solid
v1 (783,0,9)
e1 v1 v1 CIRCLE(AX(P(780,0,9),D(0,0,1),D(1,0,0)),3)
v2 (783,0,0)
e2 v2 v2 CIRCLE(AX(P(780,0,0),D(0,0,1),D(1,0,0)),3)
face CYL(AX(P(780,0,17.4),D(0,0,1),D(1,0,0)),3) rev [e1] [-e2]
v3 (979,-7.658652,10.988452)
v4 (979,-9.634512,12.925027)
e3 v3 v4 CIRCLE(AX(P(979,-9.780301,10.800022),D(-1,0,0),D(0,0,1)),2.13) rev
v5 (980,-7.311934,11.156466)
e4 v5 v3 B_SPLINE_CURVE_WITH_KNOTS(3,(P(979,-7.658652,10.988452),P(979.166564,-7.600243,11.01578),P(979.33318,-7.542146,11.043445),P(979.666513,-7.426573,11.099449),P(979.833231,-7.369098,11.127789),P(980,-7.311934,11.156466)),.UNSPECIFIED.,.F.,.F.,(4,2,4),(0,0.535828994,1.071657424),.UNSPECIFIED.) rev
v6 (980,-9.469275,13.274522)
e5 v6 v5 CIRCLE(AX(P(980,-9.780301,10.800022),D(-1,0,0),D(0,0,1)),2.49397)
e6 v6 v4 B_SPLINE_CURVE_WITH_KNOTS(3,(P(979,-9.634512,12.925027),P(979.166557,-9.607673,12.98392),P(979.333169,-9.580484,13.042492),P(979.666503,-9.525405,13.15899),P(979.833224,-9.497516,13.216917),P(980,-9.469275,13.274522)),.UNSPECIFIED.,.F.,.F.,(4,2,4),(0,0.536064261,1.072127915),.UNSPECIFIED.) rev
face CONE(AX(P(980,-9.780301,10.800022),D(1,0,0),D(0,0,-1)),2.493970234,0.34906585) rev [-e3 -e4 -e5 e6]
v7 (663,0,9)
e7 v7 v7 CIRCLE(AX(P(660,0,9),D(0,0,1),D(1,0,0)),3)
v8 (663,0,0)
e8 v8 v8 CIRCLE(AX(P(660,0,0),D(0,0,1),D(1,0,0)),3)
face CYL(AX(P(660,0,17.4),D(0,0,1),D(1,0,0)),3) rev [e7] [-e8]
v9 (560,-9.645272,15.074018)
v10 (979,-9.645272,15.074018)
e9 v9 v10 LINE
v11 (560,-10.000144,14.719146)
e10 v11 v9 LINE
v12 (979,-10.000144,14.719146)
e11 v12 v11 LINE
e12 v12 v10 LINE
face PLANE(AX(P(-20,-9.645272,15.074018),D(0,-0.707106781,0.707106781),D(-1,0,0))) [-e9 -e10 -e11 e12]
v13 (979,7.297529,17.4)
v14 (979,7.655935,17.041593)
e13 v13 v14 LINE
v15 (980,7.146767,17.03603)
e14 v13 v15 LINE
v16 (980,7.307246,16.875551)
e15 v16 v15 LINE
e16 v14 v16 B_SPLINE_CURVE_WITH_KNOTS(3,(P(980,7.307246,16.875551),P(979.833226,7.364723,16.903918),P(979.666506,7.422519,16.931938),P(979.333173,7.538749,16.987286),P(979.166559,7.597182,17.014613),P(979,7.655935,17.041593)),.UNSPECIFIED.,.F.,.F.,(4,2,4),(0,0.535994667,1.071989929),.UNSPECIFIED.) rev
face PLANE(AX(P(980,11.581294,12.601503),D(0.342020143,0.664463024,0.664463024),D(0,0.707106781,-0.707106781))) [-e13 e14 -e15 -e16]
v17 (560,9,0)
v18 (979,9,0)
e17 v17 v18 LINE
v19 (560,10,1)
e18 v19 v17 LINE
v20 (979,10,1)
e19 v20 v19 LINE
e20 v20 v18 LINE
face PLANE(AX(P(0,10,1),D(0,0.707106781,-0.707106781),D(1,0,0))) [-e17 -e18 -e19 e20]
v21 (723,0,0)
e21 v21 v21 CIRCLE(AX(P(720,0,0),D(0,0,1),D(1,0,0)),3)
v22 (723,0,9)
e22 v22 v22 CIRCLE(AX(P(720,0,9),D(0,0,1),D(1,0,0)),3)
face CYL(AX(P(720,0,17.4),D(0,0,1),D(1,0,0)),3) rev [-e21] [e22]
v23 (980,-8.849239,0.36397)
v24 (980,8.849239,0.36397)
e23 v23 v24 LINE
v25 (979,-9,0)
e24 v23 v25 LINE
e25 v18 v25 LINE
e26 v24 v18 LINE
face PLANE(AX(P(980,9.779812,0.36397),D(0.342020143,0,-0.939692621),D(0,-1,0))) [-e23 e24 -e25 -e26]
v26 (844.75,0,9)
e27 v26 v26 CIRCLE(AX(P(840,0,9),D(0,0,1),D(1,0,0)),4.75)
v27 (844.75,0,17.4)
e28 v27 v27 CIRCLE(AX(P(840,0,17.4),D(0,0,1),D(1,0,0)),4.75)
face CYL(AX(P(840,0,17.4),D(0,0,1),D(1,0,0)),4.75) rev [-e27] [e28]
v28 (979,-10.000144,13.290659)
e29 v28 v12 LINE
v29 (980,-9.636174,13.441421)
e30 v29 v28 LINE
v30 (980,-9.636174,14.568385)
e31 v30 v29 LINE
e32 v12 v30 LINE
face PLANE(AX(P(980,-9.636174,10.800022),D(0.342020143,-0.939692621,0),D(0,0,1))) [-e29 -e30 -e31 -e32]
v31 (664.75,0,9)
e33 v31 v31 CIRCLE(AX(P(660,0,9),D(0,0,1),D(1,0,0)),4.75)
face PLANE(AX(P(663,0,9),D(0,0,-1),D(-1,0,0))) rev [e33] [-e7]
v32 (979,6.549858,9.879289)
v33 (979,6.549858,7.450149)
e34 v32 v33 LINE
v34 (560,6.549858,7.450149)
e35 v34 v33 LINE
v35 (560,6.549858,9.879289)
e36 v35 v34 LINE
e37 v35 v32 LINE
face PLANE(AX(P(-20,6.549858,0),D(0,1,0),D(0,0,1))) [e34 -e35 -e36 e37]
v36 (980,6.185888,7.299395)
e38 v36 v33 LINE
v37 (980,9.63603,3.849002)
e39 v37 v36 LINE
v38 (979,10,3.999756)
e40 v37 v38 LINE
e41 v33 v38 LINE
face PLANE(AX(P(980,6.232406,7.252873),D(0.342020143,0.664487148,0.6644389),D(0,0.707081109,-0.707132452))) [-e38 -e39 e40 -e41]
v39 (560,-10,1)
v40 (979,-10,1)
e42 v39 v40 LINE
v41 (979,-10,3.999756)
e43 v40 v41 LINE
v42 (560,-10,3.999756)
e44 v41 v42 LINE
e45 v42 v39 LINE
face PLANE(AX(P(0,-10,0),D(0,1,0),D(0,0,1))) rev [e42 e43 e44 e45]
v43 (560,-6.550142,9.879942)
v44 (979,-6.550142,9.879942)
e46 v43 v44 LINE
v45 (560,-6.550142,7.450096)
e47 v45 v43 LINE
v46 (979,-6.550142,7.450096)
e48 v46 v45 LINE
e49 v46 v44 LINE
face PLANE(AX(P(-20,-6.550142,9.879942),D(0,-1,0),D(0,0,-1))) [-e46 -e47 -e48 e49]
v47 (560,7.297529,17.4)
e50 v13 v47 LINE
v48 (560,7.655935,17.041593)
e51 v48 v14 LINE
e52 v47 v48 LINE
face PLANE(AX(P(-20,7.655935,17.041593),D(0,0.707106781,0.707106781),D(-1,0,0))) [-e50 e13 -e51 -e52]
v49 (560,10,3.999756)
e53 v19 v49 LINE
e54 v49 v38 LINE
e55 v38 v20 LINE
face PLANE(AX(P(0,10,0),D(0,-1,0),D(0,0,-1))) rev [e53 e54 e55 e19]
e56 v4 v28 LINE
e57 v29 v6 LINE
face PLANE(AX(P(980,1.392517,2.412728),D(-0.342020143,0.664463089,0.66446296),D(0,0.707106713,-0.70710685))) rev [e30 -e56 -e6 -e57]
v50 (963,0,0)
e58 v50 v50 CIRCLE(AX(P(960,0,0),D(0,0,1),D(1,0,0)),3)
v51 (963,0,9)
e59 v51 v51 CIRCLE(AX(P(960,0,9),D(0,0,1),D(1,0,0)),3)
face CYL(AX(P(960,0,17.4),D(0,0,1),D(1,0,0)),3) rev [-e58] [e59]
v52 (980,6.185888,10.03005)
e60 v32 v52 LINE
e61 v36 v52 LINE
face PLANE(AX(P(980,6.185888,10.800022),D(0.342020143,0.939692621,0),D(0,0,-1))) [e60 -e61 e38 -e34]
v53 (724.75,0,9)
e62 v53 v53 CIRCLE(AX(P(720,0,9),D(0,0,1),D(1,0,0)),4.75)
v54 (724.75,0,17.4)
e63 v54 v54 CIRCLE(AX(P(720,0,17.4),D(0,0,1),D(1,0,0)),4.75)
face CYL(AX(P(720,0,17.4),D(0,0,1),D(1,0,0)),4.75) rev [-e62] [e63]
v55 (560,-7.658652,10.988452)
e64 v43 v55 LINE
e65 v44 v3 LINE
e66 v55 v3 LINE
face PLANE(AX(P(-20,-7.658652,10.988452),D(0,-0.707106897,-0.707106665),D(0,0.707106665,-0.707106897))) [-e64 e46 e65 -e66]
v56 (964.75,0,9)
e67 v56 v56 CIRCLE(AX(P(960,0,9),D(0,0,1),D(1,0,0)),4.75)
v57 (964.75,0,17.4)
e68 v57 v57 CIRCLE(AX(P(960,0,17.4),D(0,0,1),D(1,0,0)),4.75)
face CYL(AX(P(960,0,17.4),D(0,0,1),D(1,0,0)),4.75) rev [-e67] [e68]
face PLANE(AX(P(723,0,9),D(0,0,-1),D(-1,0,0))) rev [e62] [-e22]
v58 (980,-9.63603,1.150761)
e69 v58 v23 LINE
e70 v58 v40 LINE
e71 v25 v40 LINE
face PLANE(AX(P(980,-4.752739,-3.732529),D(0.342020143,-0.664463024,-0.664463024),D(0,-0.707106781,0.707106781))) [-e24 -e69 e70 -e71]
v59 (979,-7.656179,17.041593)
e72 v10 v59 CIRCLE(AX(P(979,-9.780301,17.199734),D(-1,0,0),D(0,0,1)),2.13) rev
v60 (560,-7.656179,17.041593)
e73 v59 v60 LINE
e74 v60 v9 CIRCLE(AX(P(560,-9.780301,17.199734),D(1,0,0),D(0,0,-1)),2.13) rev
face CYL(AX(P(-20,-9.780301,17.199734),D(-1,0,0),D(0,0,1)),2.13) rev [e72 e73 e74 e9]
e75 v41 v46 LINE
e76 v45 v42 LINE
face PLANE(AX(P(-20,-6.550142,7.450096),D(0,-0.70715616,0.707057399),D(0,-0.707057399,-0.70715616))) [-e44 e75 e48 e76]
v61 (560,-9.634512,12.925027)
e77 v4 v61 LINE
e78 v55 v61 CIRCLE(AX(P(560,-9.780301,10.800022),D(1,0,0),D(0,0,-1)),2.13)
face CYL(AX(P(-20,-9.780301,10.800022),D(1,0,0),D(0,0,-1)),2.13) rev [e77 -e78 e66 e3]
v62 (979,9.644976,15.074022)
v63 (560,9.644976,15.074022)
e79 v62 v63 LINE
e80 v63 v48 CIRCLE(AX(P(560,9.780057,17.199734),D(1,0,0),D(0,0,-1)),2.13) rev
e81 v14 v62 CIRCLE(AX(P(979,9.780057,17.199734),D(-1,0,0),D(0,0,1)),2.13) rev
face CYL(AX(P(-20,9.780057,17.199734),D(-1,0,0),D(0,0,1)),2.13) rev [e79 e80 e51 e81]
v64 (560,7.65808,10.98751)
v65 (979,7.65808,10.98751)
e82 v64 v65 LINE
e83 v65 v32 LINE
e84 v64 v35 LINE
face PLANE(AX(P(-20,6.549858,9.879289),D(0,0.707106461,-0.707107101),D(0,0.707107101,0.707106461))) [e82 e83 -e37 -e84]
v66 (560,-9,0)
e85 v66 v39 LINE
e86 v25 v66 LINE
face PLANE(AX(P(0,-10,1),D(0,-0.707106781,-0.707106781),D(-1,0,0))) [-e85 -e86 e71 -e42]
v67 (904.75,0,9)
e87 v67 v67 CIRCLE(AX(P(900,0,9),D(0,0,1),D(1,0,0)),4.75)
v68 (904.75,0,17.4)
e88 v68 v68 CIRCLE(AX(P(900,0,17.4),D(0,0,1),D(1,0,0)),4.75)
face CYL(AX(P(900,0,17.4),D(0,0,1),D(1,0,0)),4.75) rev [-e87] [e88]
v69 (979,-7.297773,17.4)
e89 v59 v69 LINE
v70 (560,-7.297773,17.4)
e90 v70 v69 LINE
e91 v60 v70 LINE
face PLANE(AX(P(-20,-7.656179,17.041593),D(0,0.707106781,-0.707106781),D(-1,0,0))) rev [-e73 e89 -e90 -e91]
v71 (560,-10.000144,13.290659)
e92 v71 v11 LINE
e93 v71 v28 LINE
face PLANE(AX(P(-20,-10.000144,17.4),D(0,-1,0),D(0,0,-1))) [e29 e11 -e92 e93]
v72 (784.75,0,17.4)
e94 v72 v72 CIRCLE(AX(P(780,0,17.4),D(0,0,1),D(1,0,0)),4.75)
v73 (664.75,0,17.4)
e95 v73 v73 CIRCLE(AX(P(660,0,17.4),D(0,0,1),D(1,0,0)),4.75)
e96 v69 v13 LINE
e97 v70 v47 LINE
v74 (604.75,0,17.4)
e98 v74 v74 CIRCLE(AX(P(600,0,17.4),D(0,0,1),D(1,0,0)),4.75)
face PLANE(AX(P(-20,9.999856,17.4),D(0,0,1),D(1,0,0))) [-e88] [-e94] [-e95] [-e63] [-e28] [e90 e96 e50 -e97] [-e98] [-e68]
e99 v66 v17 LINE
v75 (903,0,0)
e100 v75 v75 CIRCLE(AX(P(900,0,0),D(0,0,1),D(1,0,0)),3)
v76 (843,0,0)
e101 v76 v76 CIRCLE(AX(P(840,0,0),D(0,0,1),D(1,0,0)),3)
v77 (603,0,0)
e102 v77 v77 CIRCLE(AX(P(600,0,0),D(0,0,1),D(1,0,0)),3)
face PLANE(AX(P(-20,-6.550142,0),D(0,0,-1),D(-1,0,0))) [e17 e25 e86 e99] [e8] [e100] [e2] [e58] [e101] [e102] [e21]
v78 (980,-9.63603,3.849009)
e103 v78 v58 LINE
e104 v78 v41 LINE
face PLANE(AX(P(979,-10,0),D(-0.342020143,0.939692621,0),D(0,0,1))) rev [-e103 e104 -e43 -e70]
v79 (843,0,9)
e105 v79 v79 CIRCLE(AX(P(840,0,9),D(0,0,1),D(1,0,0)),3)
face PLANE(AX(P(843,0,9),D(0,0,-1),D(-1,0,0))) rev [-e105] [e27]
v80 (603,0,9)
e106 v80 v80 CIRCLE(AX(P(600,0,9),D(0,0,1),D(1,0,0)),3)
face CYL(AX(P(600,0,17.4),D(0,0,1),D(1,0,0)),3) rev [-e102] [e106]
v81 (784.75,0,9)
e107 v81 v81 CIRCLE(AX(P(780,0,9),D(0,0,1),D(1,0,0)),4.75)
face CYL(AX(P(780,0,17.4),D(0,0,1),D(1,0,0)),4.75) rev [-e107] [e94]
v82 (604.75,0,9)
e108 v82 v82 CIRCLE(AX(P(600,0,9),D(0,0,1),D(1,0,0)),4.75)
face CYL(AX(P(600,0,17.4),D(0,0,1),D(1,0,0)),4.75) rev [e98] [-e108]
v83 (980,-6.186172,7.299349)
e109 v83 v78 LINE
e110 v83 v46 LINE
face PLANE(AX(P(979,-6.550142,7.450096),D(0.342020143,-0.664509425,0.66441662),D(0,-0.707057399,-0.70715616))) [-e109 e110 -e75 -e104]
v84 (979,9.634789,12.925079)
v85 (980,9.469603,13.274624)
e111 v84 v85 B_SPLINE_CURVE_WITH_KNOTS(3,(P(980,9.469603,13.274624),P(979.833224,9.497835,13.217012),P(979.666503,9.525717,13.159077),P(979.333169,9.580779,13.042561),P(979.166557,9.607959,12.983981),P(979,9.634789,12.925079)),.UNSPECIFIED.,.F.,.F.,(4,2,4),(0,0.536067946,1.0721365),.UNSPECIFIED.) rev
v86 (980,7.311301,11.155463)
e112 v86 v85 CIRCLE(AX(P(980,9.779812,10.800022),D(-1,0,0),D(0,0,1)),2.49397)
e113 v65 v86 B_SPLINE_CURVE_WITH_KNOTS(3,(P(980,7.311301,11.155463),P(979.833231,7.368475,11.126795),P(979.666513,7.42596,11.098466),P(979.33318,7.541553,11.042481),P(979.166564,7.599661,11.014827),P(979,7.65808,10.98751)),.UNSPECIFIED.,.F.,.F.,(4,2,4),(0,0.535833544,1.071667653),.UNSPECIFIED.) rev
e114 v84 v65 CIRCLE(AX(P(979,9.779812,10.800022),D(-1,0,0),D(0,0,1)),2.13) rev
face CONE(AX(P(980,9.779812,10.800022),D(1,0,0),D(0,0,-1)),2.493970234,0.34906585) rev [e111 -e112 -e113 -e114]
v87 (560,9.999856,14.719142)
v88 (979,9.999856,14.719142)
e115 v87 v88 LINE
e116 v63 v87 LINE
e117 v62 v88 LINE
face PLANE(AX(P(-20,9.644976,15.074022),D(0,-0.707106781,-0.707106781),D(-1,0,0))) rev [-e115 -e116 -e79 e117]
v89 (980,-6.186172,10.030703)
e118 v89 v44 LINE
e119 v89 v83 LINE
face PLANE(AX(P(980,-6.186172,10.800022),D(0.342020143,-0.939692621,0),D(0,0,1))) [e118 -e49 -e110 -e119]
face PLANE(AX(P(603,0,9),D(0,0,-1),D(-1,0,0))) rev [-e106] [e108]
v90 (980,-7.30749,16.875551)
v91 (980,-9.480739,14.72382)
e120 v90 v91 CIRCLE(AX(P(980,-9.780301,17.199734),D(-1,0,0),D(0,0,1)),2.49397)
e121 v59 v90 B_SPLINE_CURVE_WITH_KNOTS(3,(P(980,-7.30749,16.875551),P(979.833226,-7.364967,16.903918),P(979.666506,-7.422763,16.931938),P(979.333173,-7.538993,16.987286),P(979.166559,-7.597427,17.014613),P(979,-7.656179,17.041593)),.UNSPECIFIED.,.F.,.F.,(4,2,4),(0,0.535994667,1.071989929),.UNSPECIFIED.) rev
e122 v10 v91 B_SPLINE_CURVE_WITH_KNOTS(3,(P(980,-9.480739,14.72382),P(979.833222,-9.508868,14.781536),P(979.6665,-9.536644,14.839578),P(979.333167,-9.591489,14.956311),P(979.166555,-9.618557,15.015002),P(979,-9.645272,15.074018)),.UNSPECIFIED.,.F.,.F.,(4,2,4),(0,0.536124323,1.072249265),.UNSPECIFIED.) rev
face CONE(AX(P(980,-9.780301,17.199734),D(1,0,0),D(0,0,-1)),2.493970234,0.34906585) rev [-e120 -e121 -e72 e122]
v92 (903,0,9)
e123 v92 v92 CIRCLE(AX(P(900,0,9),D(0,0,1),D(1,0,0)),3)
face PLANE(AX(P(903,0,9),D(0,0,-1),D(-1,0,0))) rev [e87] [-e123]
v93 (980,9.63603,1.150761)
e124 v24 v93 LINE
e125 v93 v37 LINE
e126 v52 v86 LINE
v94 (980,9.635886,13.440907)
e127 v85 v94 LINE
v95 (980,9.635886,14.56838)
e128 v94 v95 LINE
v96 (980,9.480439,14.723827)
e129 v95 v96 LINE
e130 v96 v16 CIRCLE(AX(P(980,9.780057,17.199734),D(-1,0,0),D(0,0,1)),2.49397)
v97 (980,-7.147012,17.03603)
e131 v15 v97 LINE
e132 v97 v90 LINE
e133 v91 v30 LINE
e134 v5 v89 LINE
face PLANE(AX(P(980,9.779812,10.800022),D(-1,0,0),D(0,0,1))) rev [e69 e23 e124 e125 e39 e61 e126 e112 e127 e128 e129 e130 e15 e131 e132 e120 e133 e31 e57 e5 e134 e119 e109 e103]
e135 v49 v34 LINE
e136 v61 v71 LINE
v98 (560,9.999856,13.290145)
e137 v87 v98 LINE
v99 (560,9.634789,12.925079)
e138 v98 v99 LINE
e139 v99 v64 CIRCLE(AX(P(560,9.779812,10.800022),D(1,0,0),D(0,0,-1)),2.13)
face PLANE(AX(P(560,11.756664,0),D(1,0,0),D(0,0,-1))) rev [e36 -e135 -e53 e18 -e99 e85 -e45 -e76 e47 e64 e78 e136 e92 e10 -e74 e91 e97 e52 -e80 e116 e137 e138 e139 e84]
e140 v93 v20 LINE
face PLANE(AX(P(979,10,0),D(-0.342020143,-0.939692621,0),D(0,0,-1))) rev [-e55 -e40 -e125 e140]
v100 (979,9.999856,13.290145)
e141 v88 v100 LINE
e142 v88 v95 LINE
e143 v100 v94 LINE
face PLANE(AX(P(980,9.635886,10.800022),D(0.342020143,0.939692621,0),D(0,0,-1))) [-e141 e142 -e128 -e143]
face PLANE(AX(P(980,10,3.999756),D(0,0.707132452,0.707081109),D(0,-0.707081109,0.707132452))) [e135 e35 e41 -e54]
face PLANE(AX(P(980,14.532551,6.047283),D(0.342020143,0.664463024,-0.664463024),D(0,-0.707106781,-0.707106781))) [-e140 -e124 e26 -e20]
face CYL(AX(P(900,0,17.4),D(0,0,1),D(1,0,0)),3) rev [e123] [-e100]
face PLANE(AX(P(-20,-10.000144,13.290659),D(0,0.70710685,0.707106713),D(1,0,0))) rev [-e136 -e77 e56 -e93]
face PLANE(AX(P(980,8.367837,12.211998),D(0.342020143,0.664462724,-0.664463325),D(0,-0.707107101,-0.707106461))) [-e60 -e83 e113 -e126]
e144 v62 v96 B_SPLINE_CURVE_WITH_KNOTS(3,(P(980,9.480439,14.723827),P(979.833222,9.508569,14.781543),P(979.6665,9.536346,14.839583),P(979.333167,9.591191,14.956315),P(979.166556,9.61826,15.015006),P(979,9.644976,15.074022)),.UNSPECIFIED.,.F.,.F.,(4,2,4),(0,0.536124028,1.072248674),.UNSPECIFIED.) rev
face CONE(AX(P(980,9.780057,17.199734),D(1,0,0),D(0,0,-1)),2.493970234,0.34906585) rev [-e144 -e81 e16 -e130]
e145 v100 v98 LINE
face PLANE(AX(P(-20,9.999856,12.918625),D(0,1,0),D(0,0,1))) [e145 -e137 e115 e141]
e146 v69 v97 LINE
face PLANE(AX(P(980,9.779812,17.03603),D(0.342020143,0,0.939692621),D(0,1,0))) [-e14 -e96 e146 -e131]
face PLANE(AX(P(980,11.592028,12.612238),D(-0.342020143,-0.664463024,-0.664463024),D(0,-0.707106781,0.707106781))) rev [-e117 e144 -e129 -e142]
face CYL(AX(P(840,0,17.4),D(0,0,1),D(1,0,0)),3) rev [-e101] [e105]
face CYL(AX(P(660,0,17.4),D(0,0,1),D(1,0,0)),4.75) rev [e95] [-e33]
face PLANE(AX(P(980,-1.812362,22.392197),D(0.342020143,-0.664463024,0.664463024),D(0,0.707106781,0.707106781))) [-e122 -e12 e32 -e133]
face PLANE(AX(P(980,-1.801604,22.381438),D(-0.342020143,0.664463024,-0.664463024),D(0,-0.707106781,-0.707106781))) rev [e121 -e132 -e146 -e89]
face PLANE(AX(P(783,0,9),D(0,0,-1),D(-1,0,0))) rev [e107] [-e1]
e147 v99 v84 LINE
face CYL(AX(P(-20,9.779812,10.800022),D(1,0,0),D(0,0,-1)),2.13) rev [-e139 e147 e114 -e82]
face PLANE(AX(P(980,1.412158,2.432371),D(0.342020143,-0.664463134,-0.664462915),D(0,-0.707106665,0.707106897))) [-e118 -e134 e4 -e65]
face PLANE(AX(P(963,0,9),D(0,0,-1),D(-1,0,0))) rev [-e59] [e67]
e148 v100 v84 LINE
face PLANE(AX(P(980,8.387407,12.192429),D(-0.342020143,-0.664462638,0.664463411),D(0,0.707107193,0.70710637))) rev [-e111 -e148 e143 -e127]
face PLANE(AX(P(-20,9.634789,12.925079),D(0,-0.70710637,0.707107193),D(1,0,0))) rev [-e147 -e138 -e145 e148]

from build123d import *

# Parameters (mm, degrees)
BOSS_EXTRUDE1_DEPTH = 1000
SKETCH2_W           = 1000
SKETCH2_H           = 7.450095573
BOSS_EXTRUDE2_DEPTH = 3.4498578
SKETCH3_W           = 1000
SKETCH3_H           = 3.9997559
BOSS_EXTRUDE3_DEPTH = 3.4501422
DRAFT1_ANGLE        = 45.002080143
DRAFT2_ANGLE        = 45.004001238
HOLE1_D             = 4.26
HOLE2_D             = 6
HOLE2_CBORE_D       = 9.5
HOLE2_CBORE_DEPTH   = 8.4
CHAMFER1_SIZE       = 0.372012979
CHAMFER2_SIZE       = 0.361963418
CHAMFER3_SIZE       = 1
CHAMFER4_SIZE       = 0.371519866
CHAMFER5_SIZE       = 0.363970234
CHAMFER5_SIZE_2     = 1
SKETCH8_W           = 580
SKETCH8_H           = 21.756808221
CUT_EXTRUDE1_DEPTH  = 981.205469728


with BuildPart() as part:
    # Sketch1 → Boss-Extrude1 (new body)
    with BuildSketch(Plane(origin=(980, 0, 0), x_dir=(0, 0, -1), z_dir=(1, 0, 0))):
        with BuildLine():
            Line((-9.879942, -6.5501422), (0, -6.5501422))
            Line((0, -6.5501422), (0, 6.5498578))
            Line((0, 6.5498578), (-9.8792889, 6.5498578))
            Line((-9.8792889, 6.5498578), (-10.98751021, 7.658080112))
            ThreePointArc((-10.98751021, 7.658080112), (-12.443339621, 8.424671607), (-12.918625382, 9.9998558))
            Line((-12.918625382, 9.9998558), (-17.4, 9.9998558))
            Line((-17.4, 9.9998558), (-17.4, -10.0001442))
            Line((-17.4, -10.0001442), (-12.918646144, -10.0001442))
            ThreePointArc((-12.918646144, -10.0001442), (-12.443576435, -8.425447232), (-10.98845212, -7.658651955))
            Line((-10.98845212, -7.658651955), (-9.879942, -6.5501422))
        make_face()
    extrude(amount=-BOSS_EXTRUDE1_DEPTH)

    # Sketch2 → Boss-Extrude2 (add)
    with BuildSketch(Plane.XZ.offset(6.5501422)):
        with Locations((480, 3.725047787)):
            Rectangle(SKETCH2_W, SKETCH2_H)
    extrude(amount=BOSS_EXTRUDE2_DEPTH)

    # Sketch3 → Boss-Extrude3 (add)
    with BuildSketch(Plane(origin=(0, 6.5498578, 0), x_dir=(-1, 0, 0), z_dir=(0, 1, 0))):
        with Locations((-480, 1.99987795)):
            Rectangle(SKETCH3_W, SKETCH3_H)
    extrude(amount=BOSS_EXTRUDE3_DEPTH)

    # Draft1
    draft1_faces = [part.faces().sort_by_distance(p)[0] for p in [
        (480, 8.2749289, 3.9997559),
    ]]
    draft(draft1_faces, Plane.ZX.offset(10), DRAFT1_ANGLE)

    # Draft2
    draft2_faces = [part.faces().sort_by_distance(p)[0] for p in [
        (480, -8.2750711, 7.450095573),
    ]]
    draft(draft2_faces, Plane(origin=(-20, -6.5501422, 9.879942), x_dir=(0, 0, -1), z_dir=(0, -1, 0)), DRAFT2_ANGLE)

    # Hole1 (through all)
    with Locations(Plane.ZY.offset(20)):
        with Locations((17.19973415, 9.78005665), (17.19973415, -9.78030085)):
            Hole(HOLE1_D / 2)

    # Hole2 (through all)
    with Locations(Plane.XY.offset(17.4)):
        with Locations((960, 0), (900, 0), (840, 0), (780, 0), (720, 0), (660, 0), (600, 0), (540, 0), (480, 0), (420, 0), (360, 0), (300, 0), (240, 0), (180, 0), (120, 0), (60, 0), (0, 0)):
            CounterBoreHole(HOLE2_D / 2, HOLE2_CBORE_D / 2, HOLE2_CBORE_DEPTH)

    # Chamfer1
    # the kernel refuses this chamfer: 0.372012979, 0.338849035 mm, written as the material it takes off along each edge
    with BuildSketch(Plane(origin=(980.956699451, -10.0001442, 12.918646144), x_dir=(0, 0, 1), z_dir=(-1, 0, 0))) as chamfer1_piece_1:
        with BuildLine():
            Line((CHAMFER1_SIZE * 0.999999998756, 0), (0.006380544, 0.365632364))
            ThreePointArc((0.006380544, 0.365632364), (0.011135852, 0.187879029), (0, 0))
            Line((0, 0), (CHAMFER1_SIZE * 0.999999998756, 0))
        make_face()
    extrude(amount=1001.913398901, mode=Mode.SUBTRACT)

    # Chamfer2
    # the kernel refuses this chamfer: 0.361963418, 0.332200971, 0.329701008, 0.329695423 mm, written as the material it takes off along each edge
    with BuildSketch(Plane(origin=(-20.930855163, -10.0001442, 15.081109855), x_dir=(0, 0, -1), z_dir=(1, 0, 0))) as chamfer2_piece_1:
        with BuildLine():
            Line((CHAMFER2_SIZE * 0.999999998629, 0), (0.007091411, 0.354872006))
            ThreePointArc((0.007091411, 0.354872006), (0.011045386, 0.182332682), (0, 0))
            Line((0, 0), (CHAMFER2_SIZE * 0.999999998629, 0))
        make_face()
    extrude(amount=1001.861710326, mode=Mode.SUBTRACT)
    with BuildSketch(Plane(origin=(-20.930855163, -7.659736399, 17.4), x_dir=(0, 0.00992372921433692, -0.9999507585868819), z_dir=(1, 0, 0))) as chamfer2_piece_2:
        with BuildLine():
            Line((0.358424162, 0), (CHAMFER2_SIZE * 0.00992372920073, CHAMFER2_SIZE * 0.999950757216))
            Line((CHAMFER2_SIZE * 0.00992372920073, CHAMFER2_SIZE * 0.999950757216), (0, 0))
            ThreePointArc((0, 0), (0.184310403, 0.007546483), (0.358424162, 0))
        make_face()
    extrude(amount=1001.861710326, mode=Mode.SUBTRACT)
    with BuildSketch(Plane(origin=(-20.930855163, 7.659492199, 17.4), x_dir=(0, -1, 0), z_dir=(1, 0, 0))) as chamfer2_piece_3:
        with BuildLine():
            Line((CHAMFER2_SIZE * 0.999999998629, 0), (0.003556904, 0.358406513))
            ThreePointArc((0.003556904, 0.358406513), (0.009375158, 0.184226438), (0, 0))
            Line((0, 0), (CHAMFER2_SIZE * 0.999999998629, 0))
        make_face()
    extrude(amount=1001.861710326, mode=Mode.SUBTRACT)
    with BuildSketch(Plane(origin=(-20.930855163, 9.9998558, 15.081105269), x_dir=(0, -0.9998008523761441, -0.019956342047966567), z_dir=(1, 0, 0))) as chamfer2_piece_4:
        with BuildLine():
            Line((0.35495059, 0), (CHAMFER2_SIZE * 0.0199563420206, CHAMFER2_SIZE * 0.999800851005))
            Line((CHAMFER2_SIZE * 0.0199563420206, CHAMFER2_SIZE * 0.999800851005), (0, 0))
            ThreePointArc((0, 0), (0.182520953, 0.007400676), (0.35495059, 0))
        make_face()
    extrude(amount=1001.861710326, mode=Mode.SUBTRACT)

    # Chamfer3
    chamfer3_edges = [part.edges().sort_by_distance(p)[0] for p in [
        (480, -10, 0),
        (480, 10, 0),
    ]]
    chamfer(chamfer3_edges, length=CHAMFER3_SIZE)

    # Chamfer4
    # the kernel refuses this chamfer: 0.371519866, 0.338374363 mm, written as the material it takes off along each edge
    with BuildSketch(Plane(origin=(980.955431303, 9.9998558, 12.918625382), x_dir=(0, -0.9998437779419388, 0.017675398462010005), z_dir=(-1, 0, 0))) as chamfer4_piece_1:
        with BuildLine():
            Line((0.365123625, 0), (CHAMFER4_SIZE * 0.0176753984456, CHAMFER4_SIZE * 0.999843777013))
            Line((CHAMFER4_SIZE * 0.0176753984456, CHAMFER4_SIZE * 0.999843777013), (0, 0))
            ThreePointArc((0, 0), (0.187754336, 0.007831758), (0.365123625, 0))
        make_face()
    extrude(amount=1001.910862607, mode=Mode.SUBTRACT)

    # Chamfer5
    # the kernel refuses this chamfer: 1, 0.363970234 mm, written as the material it takes off along each edge
    with BuildSketch(Plane(origin=(980, 9.77981245, 10.80002185), x_dir=(0, -0.42648637425097896, -0.9044939870326689), z_dir=(0, 0.9044939870326689, -0.42648637425097896))) as chamfer5_piece_1:
        Polygon((2.13 + CHAMFER5_SIZE, 0), (2.13, CHAMFER5_SIZE_2), (2.13, 0), align=None)
    revolve(axis=Axis((980, 9.77981245, 10.80002185), (-1, 0, 0)), revolution_arc=220.656237873, mode=Mode.SUBTRACT)
    with BuildSketch(Plane(origin=(980, 4.715484283, 8.044917043), x_dir=(0, -0.7071064613613919, 0.7071071010115584), z_dir=(0, 0.7071071010115584, 0.7071064613613921))) as chamfer5_piece_2_section:
        Polygon((CHAMFER5_SIZE, 0), (0, -CHAMFER5_SIZE_2), (0, 0), align=None)
    chamfer5_piece_2 = extrude(amount=6.75565178, mode=Mode.PRIVATE)
    chamfer5_piece_2 = split(chamfer5_piece_2, bisect_by=Plane(origin=(980, 6.5498578, 8.044917043), z_dir=(0, 1, 0)), keep=Keep.TOP, mode=Mode.PRIVATE)
    add(chamfer5_piece_2, mode=Mode.SUBTRACT)
    with BuildSketch(Plane(origin=(980, -6.5501422, 12.474136733), x_dir=(0, 1, 0), z_dir=(0, 0, -1))) as chamfer5_piece_3_section:
        Polygon((CHAMFER5_SIZE, 0), (0, -CHAMFER5_SIZE_2), (0, 0), align=None)
    chamfer5_piece_3 = extrude(amount=7.618235892, mode=Mode.PRIVATE)
    chamfer5_piece_3 = split(chamfer5_piece_3, bisect_by=Plane(origin=(980, -4.038121645, 9.962467006), z_dir=(0, -0.7071561601012581, 0.7070573988233514)), keep=Keep.TOP, mode=Mode.PRIVATE)
    chamfer5_piece_3 = split(chamfer5_piece_3, bisect_by=Plane(origin=(980, -7.847239567, 11.177039793), z_dir=(0, -0.7071068974739103, -0.7071066648991656)), keep=Keep.TOP, mode=Mode.PRIVATE)
    add(chamfer5_piece_3, mode=Mode.SUBTRACT)
    with BuildSketch(Plane(origin=(980, -9.493024341, 12.822825109), x_dir=(0, 0.7071068974739103, 0.7071066648991655), z_dir=(0, 0.7071066648991656, -0.7071068974739103))) as chamfer5_piece_4_section:
        Polygon((CHAMFER5_SIZE, 0), (0, -CHAMFER5_SIZE_2), (0, 0), align=None)
    chamfer5_piece_4 = extrude(amount=6.756059252, mode=Mode.PRIVATE)
    chamfer5_piece_4 = split(chamfer5_piece_4, bisect_by=Plane(origin=(980, -6.5501422, 12.822825109), z_dir=(0, -1, 0)), keep=Keep.TOP, mode=Mode.PRIVATE)
    add(chamfer5_piece_4, mode=Mode.SUBTRACT)
    with BuildSketch(Plane(origin=(980, -9.78030085, 10.80002185), x_dir=(0, -0.9126940639173625, 0.4086435435560058), z_dir=(0, -0.4086435435560058, -0.9126940639173625))) as chamfer5_piece_5:
        Polygon((2.13 + CHAMFER5_SIZE, 0), (2.13, CHAMFER5_SIZE_2), (2.13, 0), align=None)
    revolve(axis=Axis((980, -9.78030085, 10.80002185), (-1, 0, 0)), revolution_arc=220.610102929, mode=Mode.SUBTRACT)
    with BuildSketch(Plane(origin=(980, -11.834516709, 15.125031988), x_dir=(0, 0.7071068497715801, 0.7071067126015084), z_dir=(0, 0.7071067126015084, -0.70710684977158))) as chamfer5_piece_6:
        Polygon((CHAMFER5_SIZE, 0), (0, -CHAMFER5_SIZE_2), (0, 0), align=None)
    extrude(amount=5.705471763, mode=Mode.SUBTRACT)
    with BuildSketch(Plane(origin=(980, 9.78005665, 17.19973415), x_dir=(4.803669199504906e-13, 0.9147457522504255, -0.40402996020072945), z_dir=(2.0897664314390657e-13, 0.40402996020072945, 0.9147457522504255))) as chamfer5_piece_7:
        Polygon((2.13 + CHAMFER5_SIZE, 0), (2.13, CHAMFER5_SIZE_2), (2.13, 0), align=None)
    revolve(axis=Axis((980, 9.78005665, 17.19973415), (-1, 0, 0)), revolution_arc=221.717516402, mode=Mode.SUBTRACT)
    with BuildSketch(Plane(origin=(980, -10.0001442, 17.313341171), x_dir=(0, 1, 0), z_dir=(0, 0, -1)), Plane(origin=(-20, -10.0001442, 17.313341171), x_dir=(1, 0, 0), z_dir=(0, 0, -1))) as chamfer5_piece_8:
        Polygon((CHAMFER5_SIZE, 0), (0, -CHAMFER5_SIZE_2), (0, 0), align=None)
    extrude(amount=6.61687678, mode=Mode.SUBTRACT)
    with BuildSketch(Plane(origin=(980, 9.891723514, 17.4), x_dir=(0, 0, -1), z_dir=(0, -1, 0)), Plane(origin=(-20, 9.891723514, 17.4), x_dir=(1, 0, 0), z_dir=(0, -1, 0))) as chamfer5_piece_9:
        Polygon((CHAMFER5_SIZE, 0), (0, -CHAMFER5_SIZE_2), (0, 0), align=None)
    extrude(amount=19.783691229, mode=Mode.SUBTRACT)
    with BuildSketch(Plane(origin=(980, -9.78030085, 17.19973415), x_dir=(0, 0.4139328204995242, 0.910307431647852), z_dir=(-4.8803031300112123e-14, -0.910307431647852, 0.4139328204995242))) as chamfer5_piece_10:
        Polygon((2.13 + CHAMFER5_SIZE, 0), (2.13, CHAMFER5_SIZE_2), (2.13, 0), align=None)
    revolve(axis=Axis((980, -9.78030085, 17.19973415), (-1, 0, 0)), revolution_arc=221.718922177, mode=Mode.SUBTRACT)
    with BuildSketch(Plane(origin=(980, -5.463400295, 19.234372687), x_dir=(0, 0.7071067811866485, -0.7071067811864467), z_dir=(0, -0.7071067811864467, -0.7071067811866485)), Plane(origin=(980, 9.490307982, 15.2072208), x_dir=(0, -0.7071067811858096, -0.7071067811872856), z_dir=(0, -0.7071067811872856, 0.7071067811858095))) as chamfer5_piece_11:
        Polygon((CHAMFER5_SIZE, 0), (0, -CHAMFER5_SIZE_2), (0, 0), align=None)
    extrude(amount=5.695252817, mode=Mode.SUBTRACT)
    with BuildSketch(Plane(origin=(980, -7.810899507, 16.908391131), x_dir=(-3.123520195293368e-13, 0.7071067811862966, -0.7071067811867984), z_dir=(0, -0.7071067811867985, -0.7071067811862967))) as chamfer5_piece_12:
        Polygon((CHAMFER5_SIZE, 0), (0, -CHAMFER5_SIZE_2), (0, 0), align=None)
    extrude(amount=5.690254269, mode=Mode.SUBTRACT)
    with BuildSketch(Plane(origin=(980, 11.834228487, 12.884769165), x_dir=(0, -0.7071067811866217, -0.7071067811864734), z_dir=(0, -0.7071067811864734, 0.7071067811866217))) as chamfer5_piece_13:
        Polygon((CHAMFER5_SIZE, 0), (0, -CHAMFER5_SIZE_2), (0, 0), align=None)
    extrude(amount=5.690265436, mode=Mode.SUBTRACT)
    with BuildSketch(Plane(origin=(980, -10, 6.593950633), x_dir=(0, 1, 0), z_dir=(0, 0, -1)), Plane(origin=(980, 10, -1.594194733), x_dir=(0, -1, 0), z_dir=(0, 0, 1))) as chamfer5_piece_14:
        Polygon((CHAMFER5_SIZE, 0), (0, -CHAMFER5_SIZE_2), (0, 0), align=None)
    extrude(amount=8.188145365, mode=Mode.SUBTRACT)
    with BuildSketch(Plane(origin=(980, -11.594194733, 0), x_dir=(0, 0, 1), z_dir=(0, 1, 0))) as chamfer5_piece_15:
        Polygon((CHAMFER5_SIZE, 0), (0, -CHAMFER5_SIZE_2), (0, 0), align=None)
    extrude(amount=23.188389465, mode=Mode.SUBTRACT)
    with BuildSketch(Plane(origin=(980, 11.834372687, 2.834372687), x_dir=(-3.123520195293376e-13, -0.7071067811865475, 0.7071067811865475), z_dir=(0, -0.7071067811865476, -0.7071067811865476)), Plane(origin=(980, -7.165627313, -1.834372687), x_dir=(0, 0.7071067811865476, 0.7071067811865476), z_dir=(0, -0.7071067811865476, 0.7071067811865476)), Plane(origin=(-20, 11.834372687, 2.834372687), x_dir=(1, 0, 0), z_dir=(0, -0.7071067811865476, -0.7071067811865476)), Plane(origin=(-20, -7.165627313, -1.834372687), x_dir=(1, 0, 0), z_dir=(0, -0.7071067811865476, 0.7071067811865476))) as chamfer5_piece_16:
        Polygon((CHAMFER5_SIZE, 0), (0, CHAMFER5_SIZE_2), (0, 0), align=None)
    extrude(amount=6.602603027, mode=Mode.SUBTRACT)
    with BuildSketch(Plane(origin=(980, 9.9998558, 10.695950515), x_dir=(0, -1, 0), z_dir=(0, 0, 1)), Plane(origin=(-20, 9.9998558, 10.695950515), x_dir=(1, 0, 0), z_dir=(0, 0, 1))) as chamfer5_piece_17:
        Polygon((CHAMFER5_SIZE, 0), (0, -CHAMFER5_SIZE_2), (0, 0), align=None)
    extrude(amount=6.61738607, mode=Mode.SUBTRACT)
    with BuildSketch(Plane(origin=(980, 7.80041546, 11.090707467), x_dir=(0, -0.7071063697090587, 0.707107192663797), z_dir=(0, 0.7071071926637971, 0.7071063697090587))) as chamfer5_piece_18:
        Polygon((CHAMFER5_SIZE, 0), (0, -CHAMFER5_SIZE_2), (0, 0), align=None)
    extrude(amount=5.70467128, mode=Mode.SUBTRACT)
    with BuildSketch(Plane(origin=(980, -4.715897621, 9.284596359), x_dir=(0, 0.7071561601012583, -0.7070573988233513), z_dir=(0, -0.7070573988233514, -0.7071561601012581))) as chamfer5_piece_19_section:
        Polygon((CHAMFER5_SIZE, 0), (0, -CHAMFER5_SIZE_2), (0, 0), align=None)
    chamfer5_piece_19 = extrude(amount=10.067565902, mode=Mode.PRIVATE)
    chamfer5_piece_19 = split(chamfer5_piece_19, bisect_by=Plane(origin=(980, -6.5501422, 9.284596359), z_dir=(0, -1, 0)), keep=Keep.TOP, mode=Mode.PRIVATE)
    add(chamfer5_piece_19, mode=Mode.SUBTRACT)
    with BuildSketch(Plane(origin=(980, 6.5498578, 4.855953894), x_dir=(0, -1, 0), z_dir=(0, 0, 1))) as chamfer5_piece_20_section:
        Polygon((CHAMFER5_SIZE, 0), (0, -CHAMFER5_SIZE_2), (0, 0), align=None)
    chamfer5_piece_20 = extrude(amount=7.617529739, mode=Mode.PRIVATE)
    chamfer5_piece_20 = split(chamfer5_piece_20, bisect_by=Plane(origin=(980, 4.038190297, 7.367623669), z_dir=(0, 0.7071064613613921, -0.7071071010115584)), keep=Keep.TOP, mode=Mode.PRIVATE)
    chamfer5_piece_20 = split(chamfer5_piece_20, bisect_by=Plane(origin=(980, 7.846955163, 6.152957077), z_dir=(0, 0.7071324524796995, 0.7070811089613734)), keep=Keep.TOP, mode=Mode.PRIVATE)
    add(chamfer5_piece_20, mode=Mode.SUBTRACT)
    with BuildSketch(Plane(origin=(980, 4.715551711, 9.28458791), x_dir=(0, -0.7071324524796995, -0.7070811089613733), z_dir=(0, 0.7070811089613734, -0.7071324524796995))) as chamfer5_piece_21_section:
        Polygon((CHAMFER5_SIZE, 0), (0, CHAMFER5_SIZE_2), (0, 0), align=None)
    chamfer5_piece_21 = extrude(amount=10.067804509, mode=Mode.PRIVATE)
    chamfer5_piece_21 = split(chamfer5_piece_21, bisect_by=Plane(origin=(980, 6.5498578, 9.28458791), z_dir=(0, 1, 0)), keep=Keep.TOP, mode=Mode.PRIVATE)
    add(chamfer5_piece_21, mode=Mode.SUBTRACT)
    with BuildSketch(Plane(origin=(-20, 4.715484283, 8.044917043), x_dir=(1, 0, 0), z_dir=(0, 0.7071071010115584, 0.7071064613613921))) as chamfer5_piece_22_section:
        Polygon((CHAMFER5_SIZE, 0), (0, -CHAMFER5_SIZE_2), (0, 0), align=None)
    chamfer5_piece_22 = extrude(amount=6.75565178, mode=Mode.PRIVATE)
    chamfer5_piece_22 = split(chamfer5_piece_22, bisect_by=Plane(origin=(-20, 6.5498578, 8.044917043), z_dir=(0, 1, 0)), keep=Keep.TOP, mode=Mode.PRIVATE)
    add(chamfer5_piece_22, mode=Mode.SUBTRACT)
    with BuildSketch(Plane(origin=(-20, -9.78030085, 10.80002185), x_dir=(0, -0.9126940639173421, 0.4086435435560518), z_dir=(0, -0.4086435435560518, -0.9126940639173421))) as chamfer5_piece_23:
        Polygon((2.13, -CHAMFER5_SIZE), (2.13 + CHAMFER5_SIZE_2, 0), (2.13, 0), align=None)
    revolve(axis=Axis((-20, -9.78030085, 10.80002185), (-1, 0, 0)), revolution_arc=220.610102929, mode=Mode.SUBTRACT)
    with BuildSketch(Plane(origin=(-20, 9.77981245, 10.80002185), x_dir=(0, -0.42648637425102415, -0.9044939870326476), z_dir=(0, 0.9044939870326476, -0.42648637425102415))) as chamfer5_piece_24:
        Polygon((2.13, -CHAMFER5_SIZE), (2.13 + CHAMFER5_SIZE_2, 0), (2.13, 0), align=None)
    revolve(axis=Axis((-20, 9.77981245, 10.80002185), (-1, 0, 0)), revolution_arc=220.656237873, mode=Mode.SUBTRACT)
    with BuildSketch(Plane(origin=(-20, 9.78005665, 17.19973415), x_dir=(0, -0.41393283318023105, 0.9103074258817112), z_dir=(0, 0.9103074258817112, 0.41393283318023105))) as chamfer5_piece_25:
        Polygon((2.13, CHAMFER5_SIZE), (2.13 + CHAMFER5_SIZE_2, 0), (2.13, 0), align=None)
    revolve(axis=Axis((-20, 9.78005665, 17.19973415), (1, 0, 0)), revolution_arc=221.717516402, mode=Mode.SUBTRACT)
    with BuildSketch(Plane(origin=(-20, -9.78030085, 17.19973415), x_dir=(0, -0.9147556593909055, -0.40400752915299676), z_dir=(0, -0.40400752915299676, 0.9147556593909055))) as chamfer5_piece_26:
        Polygon((2.13, CHAMFER5_SIZE), (2.13 + CHAMFER5_SIZE_2, 0), (2.13, 0), align=None)
    revolve(axis=Axis((-20, -9.78030085, 17.19973415), (1, 0, 0)), revolution_arc=221.718922177, mode=Mode.SUBTRACT)
    with BuildSketch(Plane(origin=(-20, 11.594194733, 0), x_dir=(1, 0, 0), z_dir=(0, -1, 0))) as chamfer5_piece_27:
        Polygon((CHAMFER5_SIZE, 0), (0, CHAMFER5_SIZE_2), (0, 0), align=None)
    extrude(amount=23.188389465, mode=Mode.SUBTRACT)
    with BuildSketch(Plane(origin=(-20, 10, 6.593950633), x_dir=(1, 0, 0), z_dir=(0, 0, -1)), Plane(origin=(-20, -10, -1.594194733), x_dir=(1, 0, 0), z_dir=(0, 0, 1))) as chamfer5_piece_28:
        Polygon((CHAMFER5_SIZE, 0), (0, CHAMFER5_SIZE_2), (0, 0), align=None)
    extrude(amount=8.188145365, mode=Mode.SUBTRACT)
    with BuildSketch(Plane(origin=(-20, -4.715897621, 9.284596359), x_dir=(1, 0, 0), z_dir=(0, -0.7070573988233514, -0.7071561601012581))) as chamfer5_piece_29_section:
        Polygon((CHAMFER5_SIZE, 0), (0, -CHAMFER5_SIZE_2), (0, 0), align=None)
    chamfer5_piece_29 = extrude(amount=10.067565902, mode=Mode.PRIVATE)
    chamfer5_piece_29 = split(chamfer5_piece_29, bisect_by=Plane(origin=(-20, -6.5501422, 9.284596359), z_dir=(0, -1, 0)), keep=Keep.TOP, mode=Mode.PRIVATE)
    add(chamfer5_piece_29, mode=Mode.SUBTRACT)
    with BuildSketch(Plane(origin=(-20, 6.5498578, 4.855953894), x_dir=(1, 0, 0), z_dir=(0, 0, 1))) as chamfer5_piece_30_section:
        Polygon((CHAMFER5_SIZE, 0), (0, -CHAMFER5_SIZE_2), (0, 0), align=None)
    chamfer5_piece_30 = extrude(amount=7.617529739, mode=Mode.PRIVATE)
    chamfer5_piece_30 = split(chamfer5_piece_30, bisect_by=Plane(origin=(-20, 4.038190297, 7.367623669), z_dir=(0, 0.7071064613613921, -0.7071071010115584)), keep=Keep.TOP, mode=Mode.PRIVATE)
    chamfer5_piece_30 = split(chamfer5_piece_30, bisect_by=Plane(origin=(-20, 7.846955163, 6.152957077), z_dir=(0, 0.7071324524796995, 0.7070811089613734)), keep=Keep.TOP, mode=Mode.PRIVATE)
    add(chamfer5_piece_30, mode=Mode.SUBTRACT)
    with BuildSketch(Plane(origin=(-20, 4.715551711, 9.28458791), x_dir=(1, 0, 0), z_dir=(0, 0.7070811089613734, -0.7071324524796995))) as chamfer5_piece_31_section:
        Polygon((CHAMFER5_SIZE, 0), (0, CHAMFER5_SIZE_2), (0, 0), align=None)
    chamfer5_piece_31 = extrude(amount=10.067804509, mode=Mode.PRIVATE)
    chamfer5_piece_31 = split(chamfer5_piece_31, bisect_by=Plane(origin=(-20, 6.5498578, 9.28458791), z_dir=(0, 1, 0)), keep=Keep.TOP, mode=Mode.PRIVATE)
    add(chamfer5_piece_31, mode=Mode.SUBTRACT)
    with BuildSketch(Plane(origin=(-20, -9.493024341, 12.822825109), x_dir=(1, 0, 0), z_dir=(0, 0.7071066648991656, -0.7071068974739103))) as chamfer5_piece_32_section:
        Polygon((CHAMFER5_SIZE, 0), (0, -CHAMFER5_SIZE_2), (0, 0), align=None)
    chamfer5_piece_32 = extrude(amount=6.756059252, mode=Mode.PRIVATE)
    chamfer5_piece_32 = split(chamfer5_piece_32, bisect_by=Plane(origin=(-20, -6.5501422, 12.822825109), z_dir=(0, -1, 0)), keep=Keep.TOP, mode=Mode.PRIVATE)
    add(chamfer5_piece_32, mode=Mode.SUBTRACT)
    with BuildSketch(Plane(origin=(-20, -6.5501422, 12.474136733), x_dir=(1, 0, 0), z_dir=(0, 0, -1))) as chamfer5_piece_33_section:
        Polygon((CHAMFER5_SIZE, 0), (0, -CHAMFER5_SIZE_2), (0, 0), align=None)
    chamfer5_piece_33 = extrude(amount=7.618235892, mode=Mode.PRIVATE)
    chamfer5_piece_33 = split(chamfer5_piece_33, bisect_by=Plane(origin=(-20, -4.038121645, 9.962467006), z_dir=(0, -0.7071561601012581, 0.7070573988233514)), keep=Keep.TOP, mode=Mode.PRIVATE)
    chamfer5_piece_33 = split(chamfer5_piece_33, bisect_by=Plane(origin=(-20, -7.847239567, 11.177039793), z_dir=(0, -0.7071068974739103, -0.7071066648991656)), keep=Keep.TOP, mode=Mode.PRIVATE)
    add(chamfer5_piece_33, mode=Mode.SUBTRACT)
    with BuildSketch(Plane(origin=(980, 4.715484283, 8.044917043), x_dir=(0, -0.7071064613613919, 0.7071071010115584), z_dir=(0, 0.7071071010115584, 0.7071064613613921))) as chamfer5_piece_34a_section:
        Polygon((CHAMFER5_SIZE, 0), (0, -CHAMFER5_SIZE_2), (0, 0), align=None)
    chamfer5_piece_34a = extrude(amount=6.75565178, mode=Mode.PRIVATE)
    chamfer5_piece_34a = split(chamfer5_piece_34a, bisect_by=Plane(origin=(980, 6.5498578, 8.044917043), z_dir=(0, -1, 0)), keep=Keep.TOP, mode=Mode.PRIVATE)
    with BuildSketch(Plane(origin=(980, 6.5498578, 4.855953894), x_dir=(0, -1, 0), z_dir=(0, 0, 1))) as chamfer5_piece_34b_section:
        Polygon((CHAMFER5_SIZE, 0), (0, -CHAMFER5_SIZE_2), (0, 0), align=None)
    chamfer5_piece_34b = extrude(amount=7.617529739, mode=Mode.PRIVATE)
    chamfer5_piece_34b = split(chamfer5_piece_34b, bisect_by=Plane(origin=(980, 4.038190297, 7.367623669), z_dir=(0, -0.7071064613613921, 0.7071071010115584)), keep=Keep.TOP, mode=Mode.PRIVATE)
    chamfer5_piece_34 = chamfer5_piece_34a & chamfer5_piece_34b
    add(chamfer5_piece_34, mode=Mode.SUBTRACT)
    with BuildSketch(Plane(origin=(980, -6.5501422, 12.474136733), x_dir=(0, 1, 0), z_dir=(0, 0, -1))) as chamfer5_piece_35a_section:
        Polygon((CHAMFER5_SIZE, 0), (0, -CHAMFER5_SIZE_2), (0, 0), align=None)
    chamfer5_piece_35a = extrude(amount=7.618235892, mode=Mode.PRIVATE)
    chamfer5_piece_35a = split(chamfer5_piece_35a, bisect_by=Plane(origin=(980, -7.847239567, 11.177039793), z_dir=(0, 0.7071068974739103, 0.7071066648991656)), keep=Keep.TOP, mode=Mode.PRIVATE)
    with BuildSketch(Plane(origin=(980, -9.493024341, 12.822825109), x_dir=(0, 0.7071068974739103, 0.7071066648991655), z_dir=(0, 0.7071066648991656, -0.7071068974739103))) as chamfer5_piece_35b_section:
        Polygon((CHAMFER5_SIZE, 0), (0, -CHAMFER5_SIZE_2), (0, 0), align=None)
    chamfer5_piece_35b = extrude(amount=6.756059252, mode=Mode.PRIVATE)
    chamfer5_piece_35b = split(chamfer5_piece_35b, bisect_by=Plane(origin=(980, -6.5501422, 12.822825109), z_dir=(0, 1, 0)), keep=Keep.TOP, mode=Mode.PRIVATE)
    chamfer5_piece_35 = chamfer5_piece_35a & chamfer5_piece_35b
    add(chamfer5_piece_35, mode=Mode.SUBTRACT)
    with BuildSketch(Plane(origin=(980, -4.715897621, 9.284596359), x_dir=(0, 0.7071561601012583, -0.7070573988233513), z_dir=(0, -0.7070573988233514, -0.7071561601012581))) as chamfer5_piece_36a_section:
        Polygon((CHAMFER5_SIZE, 0), (0, -CHAMFER5_SIZE_2), (0, 0), align=None)
    chamfer5_piece_36a = extrude(amount=10.067565902, mode=Mode.PRIVATE)
    chamfer5_piece_36a = split(chamfer5_piece_36a, bisect_by=Plane(origin=(980, -6.5501422, 9.284596359), z_dir=(0, 1, 0)), keep=Keep.TOP, mode=Mode.PRIVATE)
    with BuildSketch(Plane(origin=(980, -6.5501422, 12.474136733), x_dir=(0, 1, 0), z_dir=(0, 0, -1))) as chamfer5_piece_36b_section:
        Polygon((CHAMFER5_SIZE, 0), (0, -CHAMFER5_SIZE_2), (0, 0), align=None)
    chamfer5_piece_36b = extrude(amount=7.618235892, mode=Mode.PRIVATE)
    chamfer5_piece_36b = split(chamfer5_piece_36b, bisect_by=Plane(origin=(980, -4.038121645, 9.962467006), z_dir=(0, 0.7071561601012581, -0.7070573988233514)), keep=Keep.TOP, mode=Mode.PRIVATE)
    chamfer5_piece_36 = chamfer5_piece_36a & chamfer5_piece_36b
    add(chamfer5_piece_36, mode=Mode.SUBTRACT)
    with BuildSketch(Plane(origin=(980, 6.5498578, 4.855953894), x_dir=(0, -1, 0), z_dir=(0, 0, 1))) as chamfer5_piece_37a_section:
        Polygon((CHAMFER5_SIZE, 0), (0, -CHAMFER5_SIZE_2), (0, 0), align=None)
    chamfer5_piece_37a = extrude(amount=7.617529739, mode=Mode.PRIVATE)
    chamfer5_piece_37a = split(chamfer5_piece_37a, bisect_by=Plane(origin=(980, 7.846955163, 6.152957077), z_dir=(0, -0.7071324524796995, -0.7070811089613734)), keep=Keep.TOP, mode=Mode.PRIVATE)
    with BuildSketch(Plane(origin=(980, 4.715551711, 9.28458791), x_dir=(0, -0.7071324524796995, -0.7070811089613733), z_dir=(0, 0.7070811089613734, -0.7071324524796995))) as chamfer5_piece_37b_section:
        Polygon((CHAMFER5_SIZE, 0), (0, CHAMFER5_SIZE_2), (0, 0), align=None)
    chamfer5_piece_37b = extrude(amount=10.067804509, mode=Mode.PRIVATE)
    chamfer5_piece_37b = split(chamfer5_piece_37b, bisect_by=Plane(origin=(980, 6.5498578, 9.28458791), z_dir=(0, -1, 0)), keep=Keep.TOP, mode=Mode.PRIVATE)
    chamfer5_piece_37 = chamfer5_piece_37a & chamfer5_piece_37b
    add(chamfer5_piece_37, mode=Mode.SUBTRACT)
    with BuildSketch(Plane(origin=(-20, 4.715484283, 8.044917043), x_dir=(1, 0, 0), z_dir=(0, 0.7071071010115584, 0.7071064613613921))) as chamfer5_piece_38a_section:
        Polygon((CHAMFER5_SIZE, 0), (0, -CHAMFER5_SIZE_2), (0, 0), align=None)
    chamfer5_piece_38a = extrude(amount=6.75565178, mode=Mode.PRIVATE)
    chamfer5_piece_38a = split(chamfer5_piece_38a, bisect_by=Plane(origin=(-20, 6.5498578, 8.044917043), z_dir=(0, -1, 0)), keep=Keep.TOP, mode=Mode.PRIVATE)
    with BuildSketch(Plane(origin=(-20, 6.5498578, 4.855953894), x_dir=(1, 0, 0), z_dir=(0, 0, 1))) as chamfer5_piece_38b_section:
        Polygon((CHAMFER5_SIZE, 0), (0, -CHAMFER5_SIZE_2), (0, 0), align=None)
    chamfer5_piece_38b = extrude(amount=7.617529739, mode=Mode.PRIVATE)
    chamfer5_piece_38b = split(chamfer5_piece_38b, bisect_by=Plane(origin=(-20, 4.038190297, 7.367623669), z_dir=(0, -0.7071064613613921, 0.7071071010115584)), keep=Keep.TOP, mode=Mode.PRIVATE)
    chamfer5_piece_38 = chamfer5_piece_38a & chamfer5_piece_38b
    add(chamfer5_piece_38, mode=Mode.SUBTRACT)
    with BuildSketch(Plane(origin=(-20, -4.715897621, 9.284596359), x_dir=(1, 0, 0), z_dir=(0, -0.7070573988233514, -0.7071561601012581))) as chamfer5_piece_39a_section:
        Polygon((CHAMFER5_SIZE, 0), (0, -CHAMFER5_SIZE_2), (0, 0), align=None)
    chamfer5_piece_39a = extrude(amount=10.067565902, mode=Mode.PRIVATE)
    chamfer5_piece_39a = split(chamfer5_piece_39a, bisect_by=Plane(origin=(-20, -6.5501422, 9.284596359), z_dir=(0, 1, 0)), keep=Keep.TOP, mode=Mode.PRIVATE)
    with BuildSketch(Plane(origin=(-20, -6.5501422, 12.474136733), x_dir=(1, 0, 0), z_dir=(0, 0, -1))) as chamfer5_piece_39b_section:
        Polygon((CHAMFER5_SIZE, 0), (0, -CHAMFER5_SIZE_2), (0, 0), align=None)
    chamfer5_piece_39b = extrude(amount=7.618235892, mode=Mode.PRIVATE)
    chamfer5_piece_39b = split(chamfer5_piece_39b, bisect_by=Plane(origin=(-20, -4.038121645, 9.962467006), z_dir=(0, 0.7071561601012581, -0.7070573988233514)), keep=Keep.TOP, mode=Mode.PRIVATE)
    chamfer5_piece_39 = chamfer5_piece_39a & chamfer5_piece_39b
    add(chamfer5_piece_39, mode=Mode.SUBTRACT)
    with BuildSketch(Plane(origin=(-20, 6.5498578, 4.855953894), x_dir=(1, 0, 0), z_dir=(0, 0, 1))) as chamfer5_piece_40a_section:
        Polygon((CHAMFER5_SIZE, 0), (0, -CHAMFER5_SIZE_2), (0, 0), align=None)
    chamfer5_piece_40a = extrude(amount=7.617529739, mode=Mode.PRIVATE)
    chamfer5_piece_40a = split(chamfer5_piece_40a, bisect_by=Plane(origin=(-20, 7.846955163, 6.152957077), z_dir=(0, -0.7071324524796995, -0.7070811089613734)), keep=Keep.TOP, mode=Mode.PRIVATE)
    with BuildSketch(Plane(origin=(-20, 4.715551711, 9.28458791), x_dir=(1, 0, 0), z_dir=(0, 0.7070811089613734, -0.7071324524796995))) as chamfer5_piece_40b_section:
        Polygon((CHAMFER5_SIZE, 0), (0, CHAMFER5_SIZE_2), (0, 0), align=None)
    chamfer5_piece_40b = extrude(amount=10.067804509, mode=Mode.PRIVATE)
    chamfer5_piece_40b = split(chamfer5_piece_40b, bisect_by=Plane(origin=(-20, 6.5498578, 9.28458791), z_dir=(0, -1, 0)), keep=Keep.TOP, mode=Mode.PRIVATE)
    chamfer5_piece_40 = chamfer5_piece_40a & chamfer5_piece_40b
    add(chamfer5_piece_40, mode=Mode.SUBTRACT)
    with BuildSketch(Plane(origin=(-20, -6.5501422, 12.474136733), x_dir=(1, 0, 0), z_dir=(0, 0, -1))) as chamfer5_piece_41a_section:
        Polygon((CHAMFER5_SIZE, 0), (0, -CHAMFER5_SIZE_2), (0, 0), align=None)
    chamfer5_piece_41a = extrude(amount=7.618235892, mode=Mode.PRIVATE)
    chamfer5_piece_41a = split(chamfer5_piece_41a, bisect_by=Plane(origin=(-20, -7.847239567, 11.177039793), z_dir=(0, 0.7071068974739103, 0.7071066648991656)), keep=Keep.TOP, mode=Mode.PRIVATE)
    with BuildSketch(Plane(origin=(-20, -9.493024341, 12.822825109), x_dir=(1, 0, 0), z_dir=(0, 0.7071066648991656, -0.7071068974739103))) as chamfer5_piece_41b_section:
        Polygon((CHAMFER5_SIZE, 0), (0, -CHAMFER5_SIZE_2), (0, 0), align=None)
    chamfer5_piece_41b = extrude(amount=6.756059252, mode=Mode.PRIVATE)
    chamfer5_piece_41b = split(chamfer5_piece_41b, bisect_by=Plane(origin=(-20, -6.5501422, 12.822825109), z_dir=(0, 1, 0)), keep=Keep.TOP, mode=Mode.PRIVATE)
    chamfer5_piece_41 = chamfer5_piece_41a & chamfer5_piece_41b
    add(chamfer5_piece_41, mode=Mode.SUBTRACT)

    # Sketch8 → Cut-Extrude1 (cut, through all)
    with BuildSketch(Plane.XY.offset(17.4)):
        with Locations((270, 0.87825991)):
            Rectangle(SKETCH8_W, SKETCH8_H)
    extrude(amount=-CUT_EXTRUDE1_DEPTH, mode=Mode.SUBTRACT)


solid = part.part
